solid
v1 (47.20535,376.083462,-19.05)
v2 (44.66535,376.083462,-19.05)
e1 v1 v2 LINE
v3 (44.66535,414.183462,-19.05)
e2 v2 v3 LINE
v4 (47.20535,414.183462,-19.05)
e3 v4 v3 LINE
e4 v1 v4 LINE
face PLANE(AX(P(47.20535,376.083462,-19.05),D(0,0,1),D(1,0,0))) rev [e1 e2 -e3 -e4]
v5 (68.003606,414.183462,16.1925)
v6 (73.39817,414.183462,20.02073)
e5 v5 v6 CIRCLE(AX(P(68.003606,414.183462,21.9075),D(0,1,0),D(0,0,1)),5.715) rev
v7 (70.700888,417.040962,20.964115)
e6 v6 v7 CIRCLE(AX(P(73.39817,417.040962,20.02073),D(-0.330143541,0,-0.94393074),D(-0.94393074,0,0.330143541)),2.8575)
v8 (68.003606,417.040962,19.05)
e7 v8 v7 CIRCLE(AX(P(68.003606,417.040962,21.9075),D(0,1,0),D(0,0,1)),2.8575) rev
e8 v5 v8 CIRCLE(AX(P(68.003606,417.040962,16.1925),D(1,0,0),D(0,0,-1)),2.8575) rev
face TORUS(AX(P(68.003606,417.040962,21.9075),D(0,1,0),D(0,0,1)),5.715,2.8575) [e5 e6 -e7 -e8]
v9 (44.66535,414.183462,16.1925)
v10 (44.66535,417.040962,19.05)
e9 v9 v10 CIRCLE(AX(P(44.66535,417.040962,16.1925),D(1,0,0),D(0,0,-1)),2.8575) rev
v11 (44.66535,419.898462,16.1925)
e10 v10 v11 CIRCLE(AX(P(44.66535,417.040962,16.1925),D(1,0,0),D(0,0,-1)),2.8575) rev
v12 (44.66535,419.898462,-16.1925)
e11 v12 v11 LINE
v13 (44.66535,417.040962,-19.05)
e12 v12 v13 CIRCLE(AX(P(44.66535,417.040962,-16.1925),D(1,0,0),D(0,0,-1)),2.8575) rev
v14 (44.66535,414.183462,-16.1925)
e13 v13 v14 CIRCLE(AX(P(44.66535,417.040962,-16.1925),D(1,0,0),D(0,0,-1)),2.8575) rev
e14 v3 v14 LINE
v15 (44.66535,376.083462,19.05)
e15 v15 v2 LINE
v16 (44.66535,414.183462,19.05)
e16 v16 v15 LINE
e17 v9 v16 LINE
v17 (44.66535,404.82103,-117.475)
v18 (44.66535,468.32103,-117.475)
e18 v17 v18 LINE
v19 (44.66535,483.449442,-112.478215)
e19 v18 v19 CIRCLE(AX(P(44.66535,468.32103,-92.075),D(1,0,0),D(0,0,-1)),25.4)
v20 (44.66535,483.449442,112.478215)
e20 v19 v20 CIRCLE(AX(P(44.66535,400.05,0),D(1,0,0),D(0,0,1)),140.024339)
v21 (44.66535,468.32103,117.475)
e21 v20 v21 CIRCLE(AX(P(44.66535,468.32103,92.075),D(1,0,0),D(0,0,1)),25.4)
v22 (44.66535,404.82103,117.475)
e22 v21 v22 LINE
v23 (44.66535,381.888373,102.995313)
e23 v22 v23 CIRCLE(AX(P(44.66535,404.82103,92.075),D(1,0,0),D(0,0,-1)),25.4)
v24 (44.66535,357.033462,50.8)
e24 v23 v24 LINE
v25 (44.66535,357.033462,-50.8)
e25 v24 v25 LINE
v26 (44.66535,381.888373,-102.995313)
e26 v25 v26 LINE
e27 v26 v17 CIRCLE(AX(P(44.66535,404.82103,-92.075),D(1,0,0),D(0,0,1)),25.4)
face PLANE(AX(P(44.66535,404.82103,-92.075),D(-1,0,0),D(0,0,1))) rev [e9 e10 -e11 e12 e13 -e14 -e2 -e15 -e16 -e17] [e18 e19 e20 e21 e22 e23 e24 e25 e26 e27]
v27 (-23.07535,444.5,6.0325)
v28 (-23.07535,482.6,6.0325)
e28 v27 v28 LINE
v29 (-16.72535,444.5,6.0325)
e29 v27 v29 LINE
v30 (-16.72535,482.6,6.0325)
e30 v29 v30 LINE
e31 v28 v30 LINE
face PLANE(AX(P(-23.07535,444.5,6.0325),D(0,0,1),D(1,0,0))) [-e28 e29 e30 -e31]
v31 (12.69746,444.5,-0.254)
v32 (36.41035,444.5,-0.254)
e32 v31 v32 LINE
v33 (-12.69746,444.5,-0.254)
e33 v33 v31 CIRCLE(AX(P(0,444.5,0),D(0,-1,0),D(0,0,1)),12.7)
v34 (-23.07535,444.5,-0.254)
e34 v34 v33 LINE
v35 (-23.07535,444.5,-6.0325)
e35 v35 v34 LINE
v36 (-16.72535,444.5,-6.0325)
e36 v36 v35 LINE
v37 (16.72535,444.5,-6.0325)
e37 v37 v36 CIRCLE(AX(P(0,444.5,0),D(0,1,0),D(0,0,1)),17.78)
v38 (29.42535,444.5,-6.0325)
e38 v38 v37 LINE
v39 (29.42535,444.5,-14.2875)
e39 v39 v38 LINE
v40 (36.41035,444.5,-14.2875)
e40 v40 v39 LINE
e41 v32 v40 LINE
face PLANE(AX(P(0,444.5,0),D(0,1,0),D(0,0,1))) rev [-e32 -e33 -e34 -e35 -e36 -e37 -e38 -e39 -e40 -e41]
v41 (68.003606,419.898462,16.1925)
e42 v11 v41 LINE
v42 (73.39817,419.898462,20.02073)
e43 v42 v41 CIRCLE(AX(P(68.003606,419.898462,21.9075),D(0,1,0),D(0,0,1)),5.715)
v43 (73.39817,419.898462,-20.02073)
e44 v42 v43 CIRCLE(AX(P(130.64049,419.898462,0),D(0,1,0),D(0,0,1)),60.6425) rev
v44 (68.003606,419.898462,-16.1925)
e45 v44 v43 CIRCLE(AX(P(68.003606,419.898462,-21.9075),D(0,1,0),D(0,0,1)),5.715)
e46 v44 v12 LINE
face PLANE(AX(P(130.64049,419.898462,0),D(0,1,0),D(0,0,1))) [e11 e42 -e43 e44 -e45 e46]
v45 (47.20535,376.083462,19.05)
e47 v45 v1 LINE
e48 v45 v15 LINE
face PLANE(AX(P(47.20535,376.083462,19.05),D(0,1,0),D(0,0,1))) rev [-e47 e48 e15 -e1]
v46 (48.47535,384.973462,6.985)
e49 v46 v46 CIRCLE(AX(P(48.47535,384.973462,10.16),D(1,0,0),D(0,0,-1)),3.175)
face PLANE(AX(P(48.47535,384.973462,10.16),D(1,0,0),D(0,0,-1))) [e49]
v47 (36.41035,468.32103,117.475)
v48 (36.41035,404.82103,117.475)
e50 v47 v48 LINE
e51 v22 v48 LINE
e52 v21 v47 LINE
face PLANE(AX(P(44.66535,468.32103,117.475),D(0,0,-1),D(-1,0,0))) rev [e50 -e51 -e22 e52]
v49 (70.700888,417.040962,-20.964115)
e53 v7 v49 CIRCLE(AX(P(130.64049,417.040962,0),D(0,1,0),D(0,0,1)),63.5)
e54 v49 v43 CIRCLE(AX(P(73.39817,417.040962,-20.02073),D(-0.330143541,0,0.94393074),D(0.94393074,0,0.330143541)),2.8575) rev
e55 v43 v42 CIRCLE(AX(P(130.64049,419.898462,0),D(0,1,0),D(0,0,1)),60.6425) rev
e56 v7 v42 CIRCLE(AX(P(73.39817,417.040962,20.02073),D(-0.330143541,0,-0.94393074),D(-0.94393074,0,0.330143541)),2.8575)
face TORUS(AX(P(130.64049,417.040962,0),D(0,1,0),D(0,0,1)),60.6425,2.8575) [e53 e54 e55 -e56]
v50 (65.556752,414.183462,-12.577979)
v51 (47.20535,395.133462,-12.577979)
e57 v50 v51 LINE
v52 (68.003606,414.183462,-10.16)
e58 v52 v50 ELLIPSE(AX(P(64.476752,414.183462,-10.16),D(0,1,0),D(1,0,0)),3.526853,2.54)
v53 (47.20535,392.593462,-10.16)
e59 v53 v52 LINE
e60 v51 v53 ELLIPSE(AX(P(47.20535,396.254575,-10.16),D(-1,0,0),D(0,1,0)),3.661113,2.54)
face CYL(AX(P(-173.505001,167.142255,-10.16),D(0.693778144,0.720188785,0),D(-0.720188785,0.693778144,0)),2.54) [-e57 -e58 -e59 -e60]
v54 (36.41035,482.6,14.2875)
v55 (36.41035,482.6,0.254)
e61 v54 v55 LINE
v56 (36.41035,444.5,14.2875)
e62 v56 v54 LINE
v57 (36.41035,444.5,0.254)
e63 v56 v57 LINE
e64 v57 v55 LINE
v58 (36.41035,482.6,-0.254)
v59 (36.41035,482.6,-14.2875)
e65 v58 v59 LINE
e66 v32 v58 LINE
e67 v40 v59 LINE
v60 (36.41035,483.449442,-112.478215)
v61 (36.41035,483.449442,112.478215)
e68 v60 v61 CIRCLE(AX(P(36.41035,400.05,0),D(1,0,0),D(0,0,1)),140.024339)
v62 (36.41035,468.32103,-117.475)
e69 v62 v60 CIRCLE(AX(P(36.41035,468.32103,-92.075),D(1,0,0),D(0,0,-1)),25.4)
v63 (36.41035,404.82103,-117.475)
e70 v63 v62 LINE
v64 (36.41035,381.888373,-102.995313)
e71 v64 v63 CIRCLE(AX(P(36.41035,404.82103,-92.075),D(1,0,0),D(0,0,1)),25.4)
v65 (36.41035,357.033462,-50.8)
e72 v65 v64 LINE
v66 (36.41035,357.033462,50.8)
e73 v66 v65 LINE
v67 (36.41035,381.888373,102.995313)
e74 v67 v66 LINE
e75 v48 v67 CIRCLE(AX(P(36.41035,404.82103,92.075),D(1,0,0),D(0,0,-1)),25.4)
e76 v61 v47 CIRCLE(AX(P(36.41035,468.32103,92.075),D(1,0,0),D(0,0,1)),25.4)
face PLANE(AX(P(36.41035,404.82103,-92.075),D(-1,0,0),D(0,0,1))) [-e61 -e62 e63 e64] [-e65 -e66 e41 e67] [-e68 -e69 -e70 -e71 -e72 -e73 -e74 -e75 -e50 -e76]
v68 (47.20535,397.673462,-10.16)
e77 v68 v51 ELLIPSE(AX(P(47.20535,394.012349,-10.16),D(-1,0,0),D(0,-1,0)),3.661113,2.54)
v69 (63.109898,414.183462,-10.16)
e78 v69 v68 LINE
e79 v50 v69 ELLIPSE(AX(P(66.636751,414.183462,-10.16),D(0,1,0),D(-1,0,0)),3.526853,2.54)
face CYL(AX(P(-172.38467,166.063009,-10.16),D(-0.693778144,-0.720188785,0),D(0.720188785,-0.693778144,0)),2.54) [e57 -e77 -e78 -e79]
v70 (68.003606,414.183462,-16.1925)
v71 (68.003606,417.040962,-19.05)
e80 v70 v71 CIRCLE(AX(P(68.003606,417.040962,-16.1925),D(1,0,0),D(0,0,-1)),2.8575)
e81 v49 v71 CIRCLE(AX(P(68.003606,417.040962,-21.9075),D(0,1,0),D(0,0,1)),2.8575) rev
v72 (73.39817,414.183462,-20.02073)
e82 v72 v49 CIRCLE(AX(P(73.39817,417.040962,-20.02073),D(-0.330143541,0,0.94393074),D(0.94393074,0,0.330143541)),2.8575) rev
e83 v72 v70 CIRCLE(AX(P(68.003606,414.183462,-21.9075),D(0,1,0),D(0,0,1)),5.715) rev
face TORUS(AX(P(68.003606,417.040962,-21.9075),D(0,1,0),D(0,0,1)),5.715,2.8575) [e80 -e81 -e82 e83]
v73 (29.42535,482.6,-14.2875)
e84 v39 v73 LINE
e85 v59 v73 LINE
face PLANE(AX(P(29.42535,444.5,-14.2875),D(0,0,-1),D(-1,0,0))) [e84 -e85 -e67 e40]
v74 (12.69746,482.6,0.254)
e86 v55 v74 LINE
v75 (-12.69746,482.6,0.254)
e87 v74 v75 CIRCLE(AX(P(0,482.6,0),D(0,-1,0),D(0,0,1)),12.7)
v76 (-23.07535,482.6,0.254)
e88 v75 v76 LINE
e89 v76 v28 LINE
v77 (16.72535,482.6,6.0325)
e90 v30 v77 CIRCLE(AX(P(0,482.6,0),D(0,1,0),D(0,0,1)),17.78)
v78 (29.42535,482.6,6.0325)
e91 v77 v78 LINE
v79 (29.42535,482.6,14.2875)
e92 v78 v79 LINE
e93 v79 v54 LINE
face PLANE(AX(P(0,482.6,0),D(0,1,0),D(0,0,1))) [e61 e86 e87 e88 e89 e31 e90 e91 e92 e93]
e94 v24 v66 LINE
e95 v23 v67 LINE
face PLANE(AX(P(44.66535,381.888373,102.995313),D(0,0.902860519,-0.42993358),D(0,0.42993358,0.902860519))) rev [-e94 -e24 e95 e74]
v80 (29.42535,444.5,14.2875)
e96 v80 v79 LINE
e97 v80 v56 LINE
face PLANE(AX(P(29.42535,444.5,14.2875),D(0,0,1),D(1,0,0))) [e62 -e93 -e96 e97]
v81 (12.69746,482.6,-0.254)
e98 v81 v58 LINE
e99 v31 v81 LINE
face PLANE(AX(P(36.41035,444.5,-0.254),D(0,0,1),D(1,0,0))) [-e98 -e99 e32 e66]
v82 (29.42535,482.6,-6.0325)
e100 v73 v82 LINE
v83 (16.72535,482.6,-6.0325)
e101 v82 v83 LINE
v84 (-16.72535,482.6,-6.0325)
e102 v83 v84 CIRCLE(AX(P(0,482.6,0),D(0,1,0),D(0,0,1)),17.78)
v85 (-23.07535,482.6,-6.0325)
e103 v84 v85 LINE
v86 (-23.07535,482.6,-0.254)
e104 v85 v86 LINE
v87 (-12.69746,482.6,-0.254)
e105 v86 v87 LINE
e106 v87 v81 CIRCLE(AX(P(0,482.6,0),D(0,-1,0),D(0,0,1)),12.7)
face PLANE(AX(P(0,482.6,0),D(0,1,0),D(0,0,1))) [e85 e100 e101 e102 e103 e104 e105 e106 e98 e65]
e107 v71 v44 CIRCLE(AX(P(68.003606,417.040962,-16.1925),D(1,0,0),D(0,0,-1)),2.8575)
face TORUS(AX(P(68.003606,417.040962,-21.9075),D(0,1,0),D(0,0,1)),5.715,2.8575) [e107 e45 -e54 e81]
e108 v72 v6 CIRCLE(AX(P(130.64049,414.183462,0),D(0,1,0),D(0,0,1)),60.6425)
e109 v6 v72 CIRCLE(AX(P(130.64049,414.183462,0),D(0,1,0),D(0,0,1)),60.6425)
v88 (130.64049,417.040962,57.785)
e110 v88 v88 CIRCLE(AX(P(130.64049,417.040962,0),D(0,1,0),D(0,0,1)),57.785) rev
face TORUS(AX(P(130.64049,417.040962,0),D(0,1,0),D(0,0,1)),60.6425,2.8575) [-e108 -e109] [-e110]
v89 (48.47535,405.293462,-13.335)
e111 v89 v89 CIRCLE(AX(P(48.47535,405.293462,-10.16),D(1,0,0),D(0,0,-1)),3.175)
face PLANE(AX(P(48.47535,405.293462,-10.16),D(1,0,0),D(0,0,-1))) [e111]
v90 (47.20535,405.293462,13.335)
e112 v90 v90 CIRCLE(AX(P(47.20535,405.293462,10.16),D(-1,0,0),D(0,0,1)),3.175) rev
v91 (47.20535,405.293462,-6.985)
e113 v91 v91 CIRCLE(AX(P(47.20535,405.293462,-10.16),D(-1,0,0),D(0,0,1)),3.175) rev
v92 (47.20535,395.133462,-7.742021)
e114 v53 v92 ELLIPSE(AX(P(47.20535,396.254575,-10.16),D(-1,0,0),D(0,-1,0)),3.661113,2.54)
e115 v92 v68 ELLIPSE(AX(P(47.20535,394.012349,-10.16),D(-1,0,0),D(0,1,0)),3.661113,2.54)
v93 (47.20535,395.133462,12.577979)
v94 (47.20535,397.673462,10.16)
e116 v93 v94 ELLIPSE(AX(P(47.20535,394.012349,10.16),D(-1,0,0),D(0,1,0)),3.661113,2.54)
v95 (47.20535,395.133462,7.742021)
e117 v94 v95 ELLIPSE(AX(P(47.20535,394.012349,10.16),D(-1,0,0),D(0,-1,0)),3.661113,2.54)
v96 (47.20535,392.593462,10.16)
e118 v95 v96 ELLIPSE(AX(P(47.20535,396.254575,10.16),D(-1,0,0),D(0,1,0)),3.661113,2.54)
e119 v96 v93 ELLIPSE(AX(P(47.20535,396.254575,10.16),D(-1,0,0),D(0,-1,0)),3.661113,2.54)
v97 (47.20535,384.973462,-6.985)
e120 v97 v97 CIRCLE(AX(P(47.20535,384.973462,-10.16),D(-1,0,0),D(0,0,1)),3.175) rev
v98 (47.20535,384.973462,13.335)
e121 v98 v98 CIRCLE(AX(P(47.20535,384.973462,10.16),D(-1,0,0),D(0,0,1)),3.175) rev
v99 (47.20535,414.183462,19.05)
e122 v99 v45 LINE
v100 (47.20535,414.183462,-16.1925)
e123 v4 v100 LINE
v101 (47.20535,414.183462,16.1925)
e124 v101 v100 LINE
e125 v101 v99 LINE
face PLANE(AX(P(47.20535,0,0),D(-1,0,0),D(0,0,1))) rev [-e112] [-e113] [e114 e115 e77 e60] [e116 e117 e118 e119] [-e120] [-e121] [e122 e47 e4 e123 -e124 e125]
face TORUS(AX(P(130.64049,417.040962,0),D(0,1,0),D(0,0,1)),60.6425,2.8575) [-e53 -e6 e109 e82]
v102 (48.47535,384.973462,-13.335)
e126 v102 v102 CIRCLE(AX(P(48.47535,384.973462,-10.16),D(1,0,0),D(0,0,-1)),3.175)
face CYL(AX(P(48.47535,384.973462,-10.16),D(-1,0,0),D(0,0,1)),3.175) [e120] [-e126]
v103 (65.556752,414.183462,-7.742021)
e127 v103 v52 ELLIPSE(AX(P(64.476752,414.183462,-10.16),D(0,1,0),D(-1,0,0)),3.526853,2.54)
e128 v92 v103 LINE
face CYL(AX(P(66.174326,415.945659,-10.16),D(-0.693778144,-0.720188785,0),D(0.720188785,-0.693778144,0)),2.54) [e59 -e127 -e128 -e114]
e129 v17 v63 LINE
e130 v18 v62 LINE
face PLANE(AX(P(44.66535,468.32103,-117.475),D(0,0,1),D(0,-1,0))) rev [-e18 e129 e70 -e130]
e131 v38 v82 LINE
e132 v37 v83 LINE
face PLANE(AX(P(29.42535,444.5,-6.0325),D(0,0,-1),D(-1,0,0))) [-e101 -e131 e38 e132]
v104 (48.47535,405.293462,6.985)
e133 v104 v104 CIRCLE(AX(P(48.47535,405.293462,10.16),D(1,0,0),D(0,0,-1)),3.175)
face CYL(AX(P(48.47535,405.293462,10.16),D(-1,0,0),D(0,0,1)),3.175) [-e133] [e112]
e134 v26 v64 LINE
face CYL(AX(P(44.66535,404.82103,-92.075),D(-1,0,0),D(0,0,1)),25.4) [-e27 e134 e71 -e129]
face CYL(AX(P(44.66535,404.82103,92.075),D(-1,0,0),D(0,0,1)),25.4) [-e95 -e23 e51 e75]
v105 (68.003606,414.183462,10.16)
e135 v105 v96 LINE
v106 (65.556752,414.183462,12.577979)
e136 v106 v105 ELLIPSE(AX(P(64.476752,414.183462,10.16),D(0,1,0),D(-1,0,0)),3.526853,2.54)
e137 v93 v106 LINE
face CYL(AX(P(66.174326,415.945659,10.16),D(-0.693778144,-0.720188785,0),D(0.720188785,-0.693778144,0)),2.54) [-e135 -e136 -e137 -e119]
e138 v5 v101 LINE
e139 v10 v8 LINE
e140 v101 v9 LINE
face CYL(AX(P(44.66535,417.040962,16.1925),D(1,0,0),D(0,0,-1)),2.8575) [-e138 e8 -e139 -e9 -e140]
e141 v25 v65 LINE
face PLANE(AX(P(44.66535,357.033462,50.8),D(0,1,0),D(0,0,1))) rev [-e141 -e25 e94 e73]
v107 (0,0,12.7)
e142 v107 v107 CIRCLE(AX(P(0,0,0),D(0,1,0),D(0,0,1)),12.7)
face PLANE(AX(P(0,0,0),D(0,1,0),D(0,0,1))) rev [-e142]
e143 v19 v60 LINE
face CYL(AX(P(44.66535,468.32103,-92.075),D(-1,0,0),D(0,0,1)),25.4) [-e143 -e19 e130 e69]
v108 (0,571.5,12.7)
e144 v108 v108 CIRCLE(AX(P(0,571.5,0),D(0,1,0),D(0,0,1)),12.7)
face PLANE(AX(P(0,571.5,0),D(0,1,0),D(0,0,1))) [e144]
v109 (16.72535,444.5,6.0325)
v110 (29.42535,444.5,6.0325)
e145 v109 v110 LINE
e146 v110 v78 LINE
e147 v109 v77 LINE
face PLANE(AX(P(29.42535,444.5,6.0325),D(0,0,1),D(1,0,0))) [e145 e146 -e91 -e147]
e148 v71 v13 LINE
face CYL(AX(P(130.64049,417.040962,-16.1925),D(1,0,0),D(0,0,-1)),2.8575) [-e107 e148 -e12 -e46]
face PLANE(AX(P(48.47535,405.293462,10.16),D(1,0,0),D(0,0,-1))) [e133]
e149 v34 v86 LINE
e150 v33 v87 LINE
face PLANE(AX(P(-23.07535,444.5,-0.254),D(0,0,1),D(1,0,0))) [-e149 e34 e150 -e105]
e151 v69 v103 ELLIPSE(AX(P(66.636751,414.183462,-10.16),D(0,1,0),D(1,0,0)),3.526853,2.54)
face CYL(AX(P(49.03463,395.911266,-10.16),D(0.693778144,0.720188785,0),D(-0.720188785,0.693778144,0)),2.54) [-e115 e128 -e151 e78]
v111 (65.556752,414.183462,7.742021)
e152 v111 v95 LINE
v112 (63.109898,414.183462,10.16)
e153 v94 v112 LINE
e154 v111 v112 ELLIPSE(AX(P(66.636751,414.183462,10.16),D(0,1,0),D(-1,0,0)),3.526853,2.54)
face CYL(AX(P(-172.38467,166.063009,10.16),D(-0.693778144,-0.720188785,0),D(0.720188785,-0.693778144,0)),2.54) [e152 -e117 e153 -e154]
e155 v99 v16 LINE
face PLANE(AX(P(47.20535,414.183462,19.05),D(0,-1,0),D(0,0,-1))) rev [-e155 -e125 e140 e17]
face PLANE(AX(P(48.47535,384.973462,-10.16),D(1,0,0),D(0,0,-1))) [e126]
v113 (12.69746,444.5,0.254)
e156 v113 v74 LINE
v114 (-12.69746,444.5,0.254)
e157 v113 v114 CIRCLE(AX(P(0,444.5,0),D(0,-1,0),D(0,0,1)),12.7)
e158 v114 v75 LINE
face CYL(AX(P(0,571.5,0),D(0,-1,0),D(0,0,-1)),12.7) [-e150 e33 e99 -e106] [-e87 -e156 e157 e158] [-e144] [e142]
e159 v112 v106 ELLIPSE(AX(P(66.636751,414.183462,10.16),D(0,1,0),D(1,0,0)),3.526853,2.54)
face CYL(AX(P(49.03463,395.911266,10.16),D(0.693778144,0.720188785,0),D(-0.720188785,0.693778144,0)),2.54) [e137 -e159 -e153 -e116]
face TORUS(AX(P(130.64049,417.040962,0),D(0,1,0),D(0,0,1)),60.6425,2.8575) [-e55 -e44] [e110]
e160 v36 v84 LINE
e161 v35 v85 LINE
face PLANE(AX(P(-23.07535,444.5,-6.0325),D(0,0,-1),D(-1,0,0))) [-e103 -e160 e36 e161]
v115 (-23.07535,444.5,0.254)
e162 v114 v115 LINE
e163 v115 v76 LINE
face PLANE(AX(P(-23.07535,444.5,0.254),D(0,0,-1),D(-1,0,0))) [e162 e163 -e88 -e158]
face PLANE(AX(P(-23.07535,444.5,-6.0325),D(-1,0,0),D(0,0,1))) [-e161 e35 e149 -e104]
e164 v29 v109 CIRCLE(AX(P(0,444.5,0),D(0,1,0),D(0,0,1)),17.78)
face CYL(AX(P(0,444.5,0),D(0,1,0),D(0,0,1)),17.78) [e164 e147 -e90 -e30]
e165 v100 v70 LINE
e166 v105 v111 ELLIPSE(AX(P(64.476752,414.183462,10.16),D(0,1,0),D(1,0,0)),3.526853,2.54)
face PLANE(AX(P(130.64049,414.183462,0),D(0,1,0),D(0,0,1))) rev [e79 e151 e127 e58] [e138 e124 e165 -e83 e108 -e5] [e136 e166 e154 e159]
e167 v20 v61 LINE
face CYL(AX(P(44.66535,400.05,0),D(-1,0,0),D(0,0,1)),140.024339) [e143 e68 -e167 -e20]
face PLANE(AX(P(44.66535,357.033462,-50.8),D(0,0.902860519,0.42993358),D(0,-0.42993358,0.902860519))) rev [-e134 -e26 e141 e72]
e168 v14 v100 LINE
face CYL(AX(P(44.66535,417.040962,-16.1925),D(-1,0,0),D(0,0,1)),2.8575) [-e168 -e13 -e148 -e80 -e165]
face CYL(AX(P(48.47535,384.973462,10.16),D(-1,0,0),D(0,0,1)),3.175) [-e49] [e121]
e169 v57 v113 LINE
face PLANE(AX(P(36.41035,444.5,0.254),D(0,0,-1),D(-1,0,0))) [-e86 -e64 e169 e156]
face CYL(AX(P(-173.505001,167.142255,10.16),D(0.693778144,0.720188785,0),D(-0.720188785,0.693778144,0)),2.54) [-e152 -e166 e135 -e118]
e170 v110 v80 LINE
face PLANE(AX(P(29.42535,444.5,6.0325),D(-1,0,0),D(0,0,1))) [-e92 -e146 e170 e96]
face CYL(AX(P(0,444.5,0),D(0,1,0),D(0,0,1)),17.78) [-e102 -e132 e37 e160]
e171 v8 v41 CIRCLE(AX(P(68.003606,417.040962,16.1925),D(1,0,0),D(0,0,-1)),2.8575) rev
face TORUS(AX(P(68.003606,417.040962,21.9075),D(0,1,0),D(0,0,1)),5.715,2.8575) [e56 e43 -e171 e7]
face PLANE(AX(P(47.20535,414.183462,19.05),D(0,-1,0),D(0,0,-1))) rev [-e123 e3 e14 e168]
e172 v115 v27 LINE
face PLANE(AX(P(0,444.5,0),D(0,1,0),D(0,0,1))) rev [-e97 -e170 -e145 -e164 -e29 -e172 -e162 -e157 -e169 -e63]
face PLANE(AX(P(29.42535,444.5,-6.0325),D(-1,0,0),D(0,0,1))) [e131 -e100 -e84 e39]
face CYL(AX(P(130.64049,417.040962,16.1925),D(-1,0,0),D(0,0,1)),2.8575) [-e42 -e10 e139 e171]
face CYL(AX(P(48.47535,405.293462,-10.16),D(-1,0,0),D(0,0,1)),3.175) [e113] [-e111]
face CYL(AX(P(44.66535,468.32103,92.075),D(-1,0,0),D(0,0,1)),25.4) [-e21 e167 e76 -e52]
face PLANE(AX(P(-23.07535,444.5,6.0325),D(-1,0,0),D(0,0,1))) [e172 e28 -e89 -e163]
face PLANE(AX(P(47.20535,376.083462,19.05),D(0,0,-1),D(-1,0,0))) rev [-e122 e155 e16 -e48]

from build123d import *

# Parameters (mm, degrees)
SKETCH1_R            = 12.7
BOSS_EXTRUDE1_DEPTH  = 571.5
BOSS_EXTRUDE2_START  = -38.1
BOSS_EXTRUDE2_DEPTH  = 38.1
BOSS_EXTRUDE3_DEPTH  = 8.255
SKETCH5_W            = 38.1
SKETCH5_H            = 38.1
BOSS_EXTRUDE4_DEPTH  = 2.54
SKETCH6_R            = 3.175
BOSS_EXTRUDE5_DEPTH  = 1.27
SKETCH7_R            = 57.785
BOSS_EXTRUDE7_DEPTH  = 5.715
FILLET2_R            = 2.8575
BOSS_EXTRUDE8_DEPTH  = 2.54
FILLET3_R            = 2.54
FILLET3_OF_MIRROR1_R = 2.54


# Some blends are built 0.0001 mm under size
with BuildPart() as part:
    # Sketch1 → Boss-Extrude1 (new body)
    with BuildSketch(Plane(origin=(0, 0, 0), x_dir=(1, 0, 0), z_dir=(0, 1, 0))):
        with Locations(Location((0, 0, 0), (0, 0, 270))):
            Circle(SKETCH1_R)
    extrude(amount=BOSS_EXTRUDE1_DEPTH)

    # Sketch3 → Boss-Extrude2 (add)
    with BuildSketch(Plane(origin=(0, 482.6, 0), x_dir=(1, 0, 0), z_dir=(0, 1, 0)).offset(BOSS_EXTRUDE2_START)):
        with BuildLine():
            Line((-23.075350333, -6.0325), (-16.725350333, -6.0325))
            ThreePointArc((-16.725350333, -6.0325), (0, -17.78), (16.725350333, -6.0325))
            Line((16.725350333, -6.0325), (29.425350333, -6.0325))
            Line((29.425350333, -6.0325), (29.425350333, -14.2875))
            Line((29.425350333, -14.2875), (36.410350333, -14.2875))
            Line((36.410350333, -14.2875), (36.410350333, -0.254))
            Line((36.410350333, -0.254), (12.697459746, -0.254))
            ThreePointArc((12.697459746, -0.254), (0, -12.7), (-12.697459746, -0.254))
            Line((-12.697459746, -0.254), (-23.075350333, -0.254))
            Line((-23.075350333, -0.254), (-23.075350333, -6.0325))
        make_face()
        with BuildLine():
            Line((-23.075350333, 6.0325), (-16.725350333, 6.0325))
            ThreePointArc((-16.725350333, 6.0325), (0, 17.78), (16.725350333, 6.0325))
            Line((16.725350333, 6.0325), (29.425350333, 6.0325))
            Line((29.425350333, 6.0325), (29.425350333, 14.2875))
            Line((29.425350333, 14.2875), (36.410350333, 14.2875))
            Line((36.410350333, 14.2875), (36.410350333, 0.254))
            Line((36.410350333, 0.254), (12.697459746, 0.254))
            ThreePointArc((12.697459746, 0.254), (0, 12.7), (-12.697459746, 0.254))
            Line((-12.697459746, 0.254), (-23.075350333, 0.254))
            Line((-23.075350333, 0.254), (-23.075350333, 6.0325))
        make_face()
    extrude(amount=BOSS_EXTRUDE2_DEPTH)

    # Sketch4 → Boss-Extrude3 (add)
    with BuildSketch(Plane(origin=(36.410350333, 0, 0), x_dir=(0, 0, -1), z_dir=(1, 0, 0))):
        with BuildLine():
            Line((-117.475, 468.321030155), (-117.475, 404.821030155))
            ThreePointArc((-117.475, 404.821030155), (-113.552150052, 391.26035076), (-102.995312942, 381.888372976))
            Line((-102.995312942, 381.888372976), (-50.8, 357.033462052))
            Line((-50.8, 357.033462052), (50.8, 357.033462052))
            Line((50.8, 357.033462052), (102.995312942, 381.888372976))
            ThreePointArc((102.995312942, 381.888372976), (113.552150052, 391.26035076), (117.475, 404.821030155))
            Line((117.475, 404.821030155), (117.475, 468.321030155))
            ThreePointArc((117.475, 468.321030155), (116.193474785, 476.28715682), (112.478214642, 483.449441581))
            ThreePointArc((112.478214642, 483.449441581), (0, 540.074339402), (-112.478214642, 483.449441581))
            ThreePointArc((-112.478214642, 483.449441581), (-116.193474785, 476.28715682), (-117.475, 468.321030155))
        make_face()
    extrude(amount=BOSS_EXTRUDE3_DEPTH)

    # Sketch5 → Boss-Extrude4 (add)
    with BuildSketch(Plane(origin=(44.665350333, 0, 0), x_dir=(0, 0, -1), z_dir=(1, 0, 0))):
        with Locations((0, 395.133462052)):
            Rectangle(SKETCH5_W, SKETCH5_H)
    extrude(amount=BOSS_EXTRUDE4_DEPTH)

    # Sketch6 → Boss-Extrude5 (add)
    with BuildSketch(Plane(origin=(47.205350333, 0, 0), x_dir=(0, 0, -1), z_dir=(1, 0, 0))):
        with Locations(Location((-10.16, 405.293462052, 0), (0, 0, 180))):
            Circle(SKETCH6_R)
        with Locations(Location((10.16, 405.293462052, 0), (0, 0, 180))):
            Circle(SKETCH6_R)
        with Locations(Location((-10.16, 384.973462052, 0), (0, 0, 180))):
            Circle(SKETCH6_R)
        with Locations(Location((10.16, 384.973462052, 0), (0, 0, 180))):
            Circle(SKETCH6_R)
    extrude(amount=BOSS_EXTRUDE5_DEPTH)



with BuildPart() as body_2:
    # Sketch7 → Boss-Extrude7 (new body)
    with BuildSketch(Plane(origin=(0, 414.183462052, 0), x_dir=(1, 0, 0), z_dir=(0, 1, 0))):
        with BuildLine():
            Line((44.665350333, -19.05), (70.065350333, -19.05))
            ThreePointArc((70.065350333, -19.05), (194.140489623, 0), (70.065350333, 19.05))
            Line((70.065350333, 19.05), (44.665350333, 19.05))
            Line((44.665350333, 19.05), (44.665350333, -19.05))
        make_face()
        with Locations(Location((130.640489623, 0, 0), (0, 0, 270))):
            Circle(SKETCH7_R, mode=Mode.SUBTRACT)
    extrude(amount=BOSS_EXTRUDE7_DEPTH)

    # Fillet2
    fillet2_edges = [body_2.edges().sort_by_distance(p)[0] for p in [
        (70.065350333, 417.040962052, -19.05),
        (70.065350333, 417.040962052, 19.05),
    ]]
    fillet(fillet2_edges, radius=FILLET2_R)
    fillet2_2_edges = [body_2.edges().sort_by_distance(p)[0] for p in [
        (130.640489623, 414.183462052, -57.785),
        (130.640489623, 419.898462052, -57.785),
        (56.334477927, 419.898462052, -19.05),
        (56.334477927, 414.183462052, -19.05),
        (56.334477927, 414.183462052, 19.05),
        (56.334477927, 419.898462052, 19.05),
        (69.657326043, 419.898462052, 19.577153527),
        (69.657326043, 414.183462052, 19.577153527),
        (69.657326043, 414.183462052, -19.577153527),
        (69.657326043, 419.898462052, -19.577153527),
    ]]
    fillet(fillet2_2_edges, radius=FILLET2_R - 0.0001)  # a hair under: the kernel refuses the full size


with BuildPart() as part_1:
    add(part.part)

    add(body_2.part)  # Boss-Extrude8 merges body 2
    # Sketch8 → Boss-Extrude8 (add, symmetric)
    with BuildSketch(Plane(origin=(0, 0, -10.16), x_dir=(-1, 0, 0), z_dir=(0, 0, -1))):
        Polygon((-68.003605521, 414.183462052), (-47.205350333, 392.593462052), (-47.205350333, 397.673462052), (-63.109898418, 414.183462052), align=None)
    boss_extrude8 = extrude(amount=BOSS_EXTRUDE8_DEPTH, both=True)

    # Fillet3
    # the kernel refuses this fillet: 2.54 mm, written as the material it takes off along each edge
    with BuildSketch(Plane(origin=(42.799859116, 393.100263266, -7.62), x_dir=(0, 0, -1), z_dir=(0.6937781444220081, 0.720188785196184, 0))) as fillet3_piece_1_section:
        with BuildLine():
            CenterArc((FILLET3_R, -FILLET3_R), FILLET3_R, 90, 90)
            Line((0, -FILLET3_R), (0, 0))
            Line((0, 0), (FILLET3_R, 0))
        make_face()
    fillet3_piece_1 = extrude(amount=35.624544702, mode=Mode.PRIVATE)
    fillet3_piece_1 = split(fillet3_piece_1, bisect_by=Plane(origin=(55.574161043, 414.183462052, -8.180317928), z_dir=(0, -1, 0)), keep=Keep.TOP, mode=Mode.PRIVATE)
    fillet3_piece_1 = split(fillet3_piece_1, bisect_by=Plane(origin=(47.205350333, 405.496068729, -8.180317928), z_dir=(1, 0, 0)), keep=Keep.TOP, mode=Mode.PRIVATE)
    add(fillet3_piece_1, mode=Mode.SUBTRACT)
    with BuildSketch(Plane(origin=(42.799859116, 393.100263266, -12.7), x_dir=(0.720188785196184, -0.6937781444220081, 0), z_dir=(0.6937781444220081, 0.720188785196184, 0))) as fillet3_piece_2_section:
        with BuildLine():
            CenterArc((FILLET3_R, -FILLET3_R), FILLET3_R, 90, 90)
            Line((0, -FILLET3_R), (0, 0))
            Line((0, 0), (FILLET3_R, 0))
        make_face()
    fillet3_piece_2 = extrude(amount=35.624544702, mode=Mode.PRIVATE)
    fillet3_piece_2 = split(fillet3_piece_2, bisect_by=Plane(origin=(55.574161043, 414.183462052, -12.139682072), z_dir=(0, -1, 0)), keep=Keep.TOP, mode=Mode.PRIVATE)
    fillet3_piece_2 = split(fillet3_piece_2, bisect_by=Plane(origin=(47.205350333, 405.496068729, -12.139682072), z_dir=(1, 0, 0)), keep=Keep.TOP, mode=Mode.PRIVATE)
    add(fillet3_piece_2, mode=Mode.SUBTRACT)
    with BuildSketch(Plane(origin=(72.409096738, 418.756660838, -12.7), x_dir=(-0.7201887851961845, 0.6937781444220077, 0), z_dir=(-0.6937781444220078, -0.7201887851961845, 0))) as fillet3_piece_3_section:
        with BuildLine():
            CenterArc((FILLET3_R, -FILLET3_R), FILLET3_R, 90, 90)
            Line((0, -FILLET3_R), (0, 0))
            Line((0, 0), (FILLET3_R, 0))
        make_face()
    fillet3_piece_3 = extrude(amount=42.678250764, mode=Mode.PRIVATE)
    fillet3_piece_3 = split(fillet3_piece_3, bisect_by=Plane(origin=(57.219699643, 414.183462052, -12.112658138), z_dir=(0, -1, 0)), keep=Keep.TOP, mode=Mode.PRIVATE)
    fillet3_piece_3 = split(fillet3_piece_3, bisect_by=Plane(origin=(47.205350333, 403.787888016, -12.112658138), z_dir=(1, 0, 0)), keep=Keep.TOP, mode=Mode.PRIVATE)
    add(fillet3_piece_3, mode=Mode.SUBTRACT)
    with BuildSketch(Plane(origin=(72.409096738, 418.756660838, -7.62), x_dir=(-0.7201887851961845, 0.6937781444220077, 0), z_dir=(-0.6937781444220078, -0.7201887851961845, 0))) as fillet3_piece_4_section:
        with BuildLine():
            CenterArc((FILLET3_R, FILLET3_R), FILLET3_R, 180, 90)
            Line((0, FILLET3_R), (0, 0))
            Line((0, 0), (FILLET3_R, 0))
        make_face()
    fillet3_piece_4 = extrude(amount=42.678250764, mode=Mode.PRIVATE)
    fillet3_piece_4 = split(fillet3_piece_4, bisect_by=Plane(origin=(57.219699643, 414.183462052, -8.207341862), z_dir=(0, -1, 0)), keep=Keep.TOP, mode=Mode.PRIVATE)
    fillet3_piece_4 = split(fillet3_piece_4, bisect_by=Plane(origin=(47.205350333, 403.787888016, -8.207341862), z_dir=(1, 0, 0)), keep=Keep.TOP, mode=Mode.PRIVATE)
    add(fillet3_piece_4, mode=Mode.SUBTRACT)

    # Mirror1: Boss-Extrude8 across plane
    add(boss_extrude8.mirror(Plane(origin=(0, 0, 0), x_dir=(1, 0, 0), z_dir=(0, 0, -1))))

    # Fillet3 of Mirror1
    # the kernel refuses this fillet: 2.54 mm, written as the material it takes off along each edge
    with BuildSketch(Plane(origin=(42.799859116, 393.100263266, 7.62), x_dir=(0.720188785196184, -0.6937781444220081, 0), z_dir=(0.6937781444220081, 0.720188785196184, 0))) as fillet3_of_mirror1_piece_1_section:
        with BuildLine():
            CenterArc((FILLET3_OF_MIRROR1_R, -FILLET3_OF_MIRROR1_R), FILLET3_OF_MIRROR1_R, 90, 90)
            Line((0, -FILLET3_OF_MIRROR1_R), (0, 0))
            Line((0, 0), (FILLET3_OF_MIRROR1_R, 0))
        make_face()
    fillet3_of_mirror1_piece_1 = extrude(amount=35.624544702, mode=Mode.PRIVATE)
    fillet3_of_mirror1_piece_1 = split(fillet3_of_mirror1_piece_1, bisect_by=Plane(origin=(55.574161043, 414.183462052, 8.180317928), z_dir=(0, -1, 0)), keep=Keep.TOP, mode=Mode.PRIVATE)
    fillet3_of_mirror1_piece_1 = split(fillet3_of_mirror1_piece_1, bisect_by=Plane(origin=(47.205350333, 405.496068729, 8.180317928), z_dir=(1, 0, 0)), keep=Keep.TOP, mode=Mode.PRIVATE)
    add(fillet3_of_mirror1_piece_1, mode=Mode.SUBTRACT)
    with BuildSketch(Plane(origin=(42.799859116, 393.100263266, 12.7), x_dir=(0, 0, -1), z_dir=(0.6937781444220081, 0.720188785196184, 0))) as fillet3_of_mirror1_piece_2_section:
        with BuildLine():
            CenterArc((FILLET3_OF_MIRROR1_R, -FILLET3_OF_MIRROR1_R), FILLET3_OF_MIRROR1_R, 90, 90)
            Line((0, -FILLET3_OF_MIRROR1_R), (0, 0))
            Line((0, 0), (FILLET3_OF_MIRROR1_R, 0))
        make_face()
    fillet3_of_mirror1_piece_2 = extrude(amount=35.624544702, mode=Mode.PRIVATE)
    fillet3_of_mirror1_piece_2 = split(fillet3_of_mirror1_piece_2, bisect_by=Plane(origin=(55.574161043, 414.183462052, 12.139682072), z_dir=(0, -1, 0)), keep=Keep.TOP, mode=Mode.PRIVATE)
    fillet3_of_mirror1_piece_2 = split(fillet3_of_mirror1_piece_2, bisect_by=Plane(origin=(47.205350333, 405.496068729, 12.139682072), z_dir=(1, 0, 0)), keep=Keep.TOP, mode=Mode.PRIVATE)
    add(fillet3_of_mirror1_piece_2, mode=Mode.SUBTRACT)
    with BuildSketch(Plane(origin=(72.409096738, 418.756660838, 12.7), x_dir=(0, 0, -1), z_dir=(-0.6937781444220078, -0.7201887851961845, 0))) as fillet3_of_mirror1_piece_3_section:
        with BuildLine():
            CenterArc((FILLET3_OF_MIRROR1_R, -FILLET3_OF_MIRROR1_R), FILLET3_OF_MIRROR1_R, 90, 90)
            Line((0, -FILLET3_OF_MIRROR1_R), (0, 0))
            Line((0, 0), (FILLET3_OF_MIRROR1_R, 0))
        make_face()
    fillet3_of_mirror1_piece_3 = extrude(amount=42.678250764, mode=Mode.PRIVATE)
    fillet3_of_mirror1_piece_3 = split(fillet3_of_mirror1_piece_3, bisect_by=Plane(origin=(57.219699643, 414.183462052, 12.112658138), z_dir=(0, -1, 0)), keep=Keep.TOP, mode=Mode.PRIVATE)
    fillet3_of_mirror1_piece_3 = split(fillet3_of_mirror1_piece_3, bisect_by=Plane(origin=(47.205350333, 403.787888016, 12.112658138), z_dir=(1, 0, 0)), keep=Keep.TOP, mode=Mode.PRIVATE)
    add(fillet3_of_mirror1_piece_3, mode=Mode.SUBTRACT)
    with BuildSketch(Plane(origin=(72.409096738, 418.756660838, 7.62), x_dir=(0, 0, 1), z_dir=(-0.6937781444220078, -0.7201887851961845, 0))) as fillet3_of_mirror1_piece_4_section:
        with BuildLine():
            CenterArc((FILLET3_OF_MIRROR1_R, FILLET3_OF_MIRROR1_R), FILLET3_OF_MIRROR1_R, 180, 90)
            Line((0, FILLET3_OF_MIRROR1_R), (0, 0))
            Line((0, 0), (FILLET3_OF_MIRROR1_R, 0))
        make_face()
    fillet3_of_mirror1_piece_4 = extrude(amount=42.678250764, mode=Mode.PRIVATE)
    fillet3_of_mirror1_piece_4 = split(fillet3_of_mirror1_piece_4, bisect_by=Plane(origin=(57.219699643, 414.183462052, 8.207341862), z_dir=(0, -1, 0)), keep=Keep.TOP, mode=Mode.PRIVATE)
    fillet3_of_mirror1_piece_4 = split(fillet3_of_mirror1_piece_4, bisect_by=Plane(origin=(47.205350333, 403.787888016, 8.207341862), z_dir=(1, 0, 0)), keep=Keep.TOP, mode=Mode.PRIVATE)
    add(fillet3_of_mirror1_piece_4, mode=Mode.SUBTRACT)


solid = part_1.part
